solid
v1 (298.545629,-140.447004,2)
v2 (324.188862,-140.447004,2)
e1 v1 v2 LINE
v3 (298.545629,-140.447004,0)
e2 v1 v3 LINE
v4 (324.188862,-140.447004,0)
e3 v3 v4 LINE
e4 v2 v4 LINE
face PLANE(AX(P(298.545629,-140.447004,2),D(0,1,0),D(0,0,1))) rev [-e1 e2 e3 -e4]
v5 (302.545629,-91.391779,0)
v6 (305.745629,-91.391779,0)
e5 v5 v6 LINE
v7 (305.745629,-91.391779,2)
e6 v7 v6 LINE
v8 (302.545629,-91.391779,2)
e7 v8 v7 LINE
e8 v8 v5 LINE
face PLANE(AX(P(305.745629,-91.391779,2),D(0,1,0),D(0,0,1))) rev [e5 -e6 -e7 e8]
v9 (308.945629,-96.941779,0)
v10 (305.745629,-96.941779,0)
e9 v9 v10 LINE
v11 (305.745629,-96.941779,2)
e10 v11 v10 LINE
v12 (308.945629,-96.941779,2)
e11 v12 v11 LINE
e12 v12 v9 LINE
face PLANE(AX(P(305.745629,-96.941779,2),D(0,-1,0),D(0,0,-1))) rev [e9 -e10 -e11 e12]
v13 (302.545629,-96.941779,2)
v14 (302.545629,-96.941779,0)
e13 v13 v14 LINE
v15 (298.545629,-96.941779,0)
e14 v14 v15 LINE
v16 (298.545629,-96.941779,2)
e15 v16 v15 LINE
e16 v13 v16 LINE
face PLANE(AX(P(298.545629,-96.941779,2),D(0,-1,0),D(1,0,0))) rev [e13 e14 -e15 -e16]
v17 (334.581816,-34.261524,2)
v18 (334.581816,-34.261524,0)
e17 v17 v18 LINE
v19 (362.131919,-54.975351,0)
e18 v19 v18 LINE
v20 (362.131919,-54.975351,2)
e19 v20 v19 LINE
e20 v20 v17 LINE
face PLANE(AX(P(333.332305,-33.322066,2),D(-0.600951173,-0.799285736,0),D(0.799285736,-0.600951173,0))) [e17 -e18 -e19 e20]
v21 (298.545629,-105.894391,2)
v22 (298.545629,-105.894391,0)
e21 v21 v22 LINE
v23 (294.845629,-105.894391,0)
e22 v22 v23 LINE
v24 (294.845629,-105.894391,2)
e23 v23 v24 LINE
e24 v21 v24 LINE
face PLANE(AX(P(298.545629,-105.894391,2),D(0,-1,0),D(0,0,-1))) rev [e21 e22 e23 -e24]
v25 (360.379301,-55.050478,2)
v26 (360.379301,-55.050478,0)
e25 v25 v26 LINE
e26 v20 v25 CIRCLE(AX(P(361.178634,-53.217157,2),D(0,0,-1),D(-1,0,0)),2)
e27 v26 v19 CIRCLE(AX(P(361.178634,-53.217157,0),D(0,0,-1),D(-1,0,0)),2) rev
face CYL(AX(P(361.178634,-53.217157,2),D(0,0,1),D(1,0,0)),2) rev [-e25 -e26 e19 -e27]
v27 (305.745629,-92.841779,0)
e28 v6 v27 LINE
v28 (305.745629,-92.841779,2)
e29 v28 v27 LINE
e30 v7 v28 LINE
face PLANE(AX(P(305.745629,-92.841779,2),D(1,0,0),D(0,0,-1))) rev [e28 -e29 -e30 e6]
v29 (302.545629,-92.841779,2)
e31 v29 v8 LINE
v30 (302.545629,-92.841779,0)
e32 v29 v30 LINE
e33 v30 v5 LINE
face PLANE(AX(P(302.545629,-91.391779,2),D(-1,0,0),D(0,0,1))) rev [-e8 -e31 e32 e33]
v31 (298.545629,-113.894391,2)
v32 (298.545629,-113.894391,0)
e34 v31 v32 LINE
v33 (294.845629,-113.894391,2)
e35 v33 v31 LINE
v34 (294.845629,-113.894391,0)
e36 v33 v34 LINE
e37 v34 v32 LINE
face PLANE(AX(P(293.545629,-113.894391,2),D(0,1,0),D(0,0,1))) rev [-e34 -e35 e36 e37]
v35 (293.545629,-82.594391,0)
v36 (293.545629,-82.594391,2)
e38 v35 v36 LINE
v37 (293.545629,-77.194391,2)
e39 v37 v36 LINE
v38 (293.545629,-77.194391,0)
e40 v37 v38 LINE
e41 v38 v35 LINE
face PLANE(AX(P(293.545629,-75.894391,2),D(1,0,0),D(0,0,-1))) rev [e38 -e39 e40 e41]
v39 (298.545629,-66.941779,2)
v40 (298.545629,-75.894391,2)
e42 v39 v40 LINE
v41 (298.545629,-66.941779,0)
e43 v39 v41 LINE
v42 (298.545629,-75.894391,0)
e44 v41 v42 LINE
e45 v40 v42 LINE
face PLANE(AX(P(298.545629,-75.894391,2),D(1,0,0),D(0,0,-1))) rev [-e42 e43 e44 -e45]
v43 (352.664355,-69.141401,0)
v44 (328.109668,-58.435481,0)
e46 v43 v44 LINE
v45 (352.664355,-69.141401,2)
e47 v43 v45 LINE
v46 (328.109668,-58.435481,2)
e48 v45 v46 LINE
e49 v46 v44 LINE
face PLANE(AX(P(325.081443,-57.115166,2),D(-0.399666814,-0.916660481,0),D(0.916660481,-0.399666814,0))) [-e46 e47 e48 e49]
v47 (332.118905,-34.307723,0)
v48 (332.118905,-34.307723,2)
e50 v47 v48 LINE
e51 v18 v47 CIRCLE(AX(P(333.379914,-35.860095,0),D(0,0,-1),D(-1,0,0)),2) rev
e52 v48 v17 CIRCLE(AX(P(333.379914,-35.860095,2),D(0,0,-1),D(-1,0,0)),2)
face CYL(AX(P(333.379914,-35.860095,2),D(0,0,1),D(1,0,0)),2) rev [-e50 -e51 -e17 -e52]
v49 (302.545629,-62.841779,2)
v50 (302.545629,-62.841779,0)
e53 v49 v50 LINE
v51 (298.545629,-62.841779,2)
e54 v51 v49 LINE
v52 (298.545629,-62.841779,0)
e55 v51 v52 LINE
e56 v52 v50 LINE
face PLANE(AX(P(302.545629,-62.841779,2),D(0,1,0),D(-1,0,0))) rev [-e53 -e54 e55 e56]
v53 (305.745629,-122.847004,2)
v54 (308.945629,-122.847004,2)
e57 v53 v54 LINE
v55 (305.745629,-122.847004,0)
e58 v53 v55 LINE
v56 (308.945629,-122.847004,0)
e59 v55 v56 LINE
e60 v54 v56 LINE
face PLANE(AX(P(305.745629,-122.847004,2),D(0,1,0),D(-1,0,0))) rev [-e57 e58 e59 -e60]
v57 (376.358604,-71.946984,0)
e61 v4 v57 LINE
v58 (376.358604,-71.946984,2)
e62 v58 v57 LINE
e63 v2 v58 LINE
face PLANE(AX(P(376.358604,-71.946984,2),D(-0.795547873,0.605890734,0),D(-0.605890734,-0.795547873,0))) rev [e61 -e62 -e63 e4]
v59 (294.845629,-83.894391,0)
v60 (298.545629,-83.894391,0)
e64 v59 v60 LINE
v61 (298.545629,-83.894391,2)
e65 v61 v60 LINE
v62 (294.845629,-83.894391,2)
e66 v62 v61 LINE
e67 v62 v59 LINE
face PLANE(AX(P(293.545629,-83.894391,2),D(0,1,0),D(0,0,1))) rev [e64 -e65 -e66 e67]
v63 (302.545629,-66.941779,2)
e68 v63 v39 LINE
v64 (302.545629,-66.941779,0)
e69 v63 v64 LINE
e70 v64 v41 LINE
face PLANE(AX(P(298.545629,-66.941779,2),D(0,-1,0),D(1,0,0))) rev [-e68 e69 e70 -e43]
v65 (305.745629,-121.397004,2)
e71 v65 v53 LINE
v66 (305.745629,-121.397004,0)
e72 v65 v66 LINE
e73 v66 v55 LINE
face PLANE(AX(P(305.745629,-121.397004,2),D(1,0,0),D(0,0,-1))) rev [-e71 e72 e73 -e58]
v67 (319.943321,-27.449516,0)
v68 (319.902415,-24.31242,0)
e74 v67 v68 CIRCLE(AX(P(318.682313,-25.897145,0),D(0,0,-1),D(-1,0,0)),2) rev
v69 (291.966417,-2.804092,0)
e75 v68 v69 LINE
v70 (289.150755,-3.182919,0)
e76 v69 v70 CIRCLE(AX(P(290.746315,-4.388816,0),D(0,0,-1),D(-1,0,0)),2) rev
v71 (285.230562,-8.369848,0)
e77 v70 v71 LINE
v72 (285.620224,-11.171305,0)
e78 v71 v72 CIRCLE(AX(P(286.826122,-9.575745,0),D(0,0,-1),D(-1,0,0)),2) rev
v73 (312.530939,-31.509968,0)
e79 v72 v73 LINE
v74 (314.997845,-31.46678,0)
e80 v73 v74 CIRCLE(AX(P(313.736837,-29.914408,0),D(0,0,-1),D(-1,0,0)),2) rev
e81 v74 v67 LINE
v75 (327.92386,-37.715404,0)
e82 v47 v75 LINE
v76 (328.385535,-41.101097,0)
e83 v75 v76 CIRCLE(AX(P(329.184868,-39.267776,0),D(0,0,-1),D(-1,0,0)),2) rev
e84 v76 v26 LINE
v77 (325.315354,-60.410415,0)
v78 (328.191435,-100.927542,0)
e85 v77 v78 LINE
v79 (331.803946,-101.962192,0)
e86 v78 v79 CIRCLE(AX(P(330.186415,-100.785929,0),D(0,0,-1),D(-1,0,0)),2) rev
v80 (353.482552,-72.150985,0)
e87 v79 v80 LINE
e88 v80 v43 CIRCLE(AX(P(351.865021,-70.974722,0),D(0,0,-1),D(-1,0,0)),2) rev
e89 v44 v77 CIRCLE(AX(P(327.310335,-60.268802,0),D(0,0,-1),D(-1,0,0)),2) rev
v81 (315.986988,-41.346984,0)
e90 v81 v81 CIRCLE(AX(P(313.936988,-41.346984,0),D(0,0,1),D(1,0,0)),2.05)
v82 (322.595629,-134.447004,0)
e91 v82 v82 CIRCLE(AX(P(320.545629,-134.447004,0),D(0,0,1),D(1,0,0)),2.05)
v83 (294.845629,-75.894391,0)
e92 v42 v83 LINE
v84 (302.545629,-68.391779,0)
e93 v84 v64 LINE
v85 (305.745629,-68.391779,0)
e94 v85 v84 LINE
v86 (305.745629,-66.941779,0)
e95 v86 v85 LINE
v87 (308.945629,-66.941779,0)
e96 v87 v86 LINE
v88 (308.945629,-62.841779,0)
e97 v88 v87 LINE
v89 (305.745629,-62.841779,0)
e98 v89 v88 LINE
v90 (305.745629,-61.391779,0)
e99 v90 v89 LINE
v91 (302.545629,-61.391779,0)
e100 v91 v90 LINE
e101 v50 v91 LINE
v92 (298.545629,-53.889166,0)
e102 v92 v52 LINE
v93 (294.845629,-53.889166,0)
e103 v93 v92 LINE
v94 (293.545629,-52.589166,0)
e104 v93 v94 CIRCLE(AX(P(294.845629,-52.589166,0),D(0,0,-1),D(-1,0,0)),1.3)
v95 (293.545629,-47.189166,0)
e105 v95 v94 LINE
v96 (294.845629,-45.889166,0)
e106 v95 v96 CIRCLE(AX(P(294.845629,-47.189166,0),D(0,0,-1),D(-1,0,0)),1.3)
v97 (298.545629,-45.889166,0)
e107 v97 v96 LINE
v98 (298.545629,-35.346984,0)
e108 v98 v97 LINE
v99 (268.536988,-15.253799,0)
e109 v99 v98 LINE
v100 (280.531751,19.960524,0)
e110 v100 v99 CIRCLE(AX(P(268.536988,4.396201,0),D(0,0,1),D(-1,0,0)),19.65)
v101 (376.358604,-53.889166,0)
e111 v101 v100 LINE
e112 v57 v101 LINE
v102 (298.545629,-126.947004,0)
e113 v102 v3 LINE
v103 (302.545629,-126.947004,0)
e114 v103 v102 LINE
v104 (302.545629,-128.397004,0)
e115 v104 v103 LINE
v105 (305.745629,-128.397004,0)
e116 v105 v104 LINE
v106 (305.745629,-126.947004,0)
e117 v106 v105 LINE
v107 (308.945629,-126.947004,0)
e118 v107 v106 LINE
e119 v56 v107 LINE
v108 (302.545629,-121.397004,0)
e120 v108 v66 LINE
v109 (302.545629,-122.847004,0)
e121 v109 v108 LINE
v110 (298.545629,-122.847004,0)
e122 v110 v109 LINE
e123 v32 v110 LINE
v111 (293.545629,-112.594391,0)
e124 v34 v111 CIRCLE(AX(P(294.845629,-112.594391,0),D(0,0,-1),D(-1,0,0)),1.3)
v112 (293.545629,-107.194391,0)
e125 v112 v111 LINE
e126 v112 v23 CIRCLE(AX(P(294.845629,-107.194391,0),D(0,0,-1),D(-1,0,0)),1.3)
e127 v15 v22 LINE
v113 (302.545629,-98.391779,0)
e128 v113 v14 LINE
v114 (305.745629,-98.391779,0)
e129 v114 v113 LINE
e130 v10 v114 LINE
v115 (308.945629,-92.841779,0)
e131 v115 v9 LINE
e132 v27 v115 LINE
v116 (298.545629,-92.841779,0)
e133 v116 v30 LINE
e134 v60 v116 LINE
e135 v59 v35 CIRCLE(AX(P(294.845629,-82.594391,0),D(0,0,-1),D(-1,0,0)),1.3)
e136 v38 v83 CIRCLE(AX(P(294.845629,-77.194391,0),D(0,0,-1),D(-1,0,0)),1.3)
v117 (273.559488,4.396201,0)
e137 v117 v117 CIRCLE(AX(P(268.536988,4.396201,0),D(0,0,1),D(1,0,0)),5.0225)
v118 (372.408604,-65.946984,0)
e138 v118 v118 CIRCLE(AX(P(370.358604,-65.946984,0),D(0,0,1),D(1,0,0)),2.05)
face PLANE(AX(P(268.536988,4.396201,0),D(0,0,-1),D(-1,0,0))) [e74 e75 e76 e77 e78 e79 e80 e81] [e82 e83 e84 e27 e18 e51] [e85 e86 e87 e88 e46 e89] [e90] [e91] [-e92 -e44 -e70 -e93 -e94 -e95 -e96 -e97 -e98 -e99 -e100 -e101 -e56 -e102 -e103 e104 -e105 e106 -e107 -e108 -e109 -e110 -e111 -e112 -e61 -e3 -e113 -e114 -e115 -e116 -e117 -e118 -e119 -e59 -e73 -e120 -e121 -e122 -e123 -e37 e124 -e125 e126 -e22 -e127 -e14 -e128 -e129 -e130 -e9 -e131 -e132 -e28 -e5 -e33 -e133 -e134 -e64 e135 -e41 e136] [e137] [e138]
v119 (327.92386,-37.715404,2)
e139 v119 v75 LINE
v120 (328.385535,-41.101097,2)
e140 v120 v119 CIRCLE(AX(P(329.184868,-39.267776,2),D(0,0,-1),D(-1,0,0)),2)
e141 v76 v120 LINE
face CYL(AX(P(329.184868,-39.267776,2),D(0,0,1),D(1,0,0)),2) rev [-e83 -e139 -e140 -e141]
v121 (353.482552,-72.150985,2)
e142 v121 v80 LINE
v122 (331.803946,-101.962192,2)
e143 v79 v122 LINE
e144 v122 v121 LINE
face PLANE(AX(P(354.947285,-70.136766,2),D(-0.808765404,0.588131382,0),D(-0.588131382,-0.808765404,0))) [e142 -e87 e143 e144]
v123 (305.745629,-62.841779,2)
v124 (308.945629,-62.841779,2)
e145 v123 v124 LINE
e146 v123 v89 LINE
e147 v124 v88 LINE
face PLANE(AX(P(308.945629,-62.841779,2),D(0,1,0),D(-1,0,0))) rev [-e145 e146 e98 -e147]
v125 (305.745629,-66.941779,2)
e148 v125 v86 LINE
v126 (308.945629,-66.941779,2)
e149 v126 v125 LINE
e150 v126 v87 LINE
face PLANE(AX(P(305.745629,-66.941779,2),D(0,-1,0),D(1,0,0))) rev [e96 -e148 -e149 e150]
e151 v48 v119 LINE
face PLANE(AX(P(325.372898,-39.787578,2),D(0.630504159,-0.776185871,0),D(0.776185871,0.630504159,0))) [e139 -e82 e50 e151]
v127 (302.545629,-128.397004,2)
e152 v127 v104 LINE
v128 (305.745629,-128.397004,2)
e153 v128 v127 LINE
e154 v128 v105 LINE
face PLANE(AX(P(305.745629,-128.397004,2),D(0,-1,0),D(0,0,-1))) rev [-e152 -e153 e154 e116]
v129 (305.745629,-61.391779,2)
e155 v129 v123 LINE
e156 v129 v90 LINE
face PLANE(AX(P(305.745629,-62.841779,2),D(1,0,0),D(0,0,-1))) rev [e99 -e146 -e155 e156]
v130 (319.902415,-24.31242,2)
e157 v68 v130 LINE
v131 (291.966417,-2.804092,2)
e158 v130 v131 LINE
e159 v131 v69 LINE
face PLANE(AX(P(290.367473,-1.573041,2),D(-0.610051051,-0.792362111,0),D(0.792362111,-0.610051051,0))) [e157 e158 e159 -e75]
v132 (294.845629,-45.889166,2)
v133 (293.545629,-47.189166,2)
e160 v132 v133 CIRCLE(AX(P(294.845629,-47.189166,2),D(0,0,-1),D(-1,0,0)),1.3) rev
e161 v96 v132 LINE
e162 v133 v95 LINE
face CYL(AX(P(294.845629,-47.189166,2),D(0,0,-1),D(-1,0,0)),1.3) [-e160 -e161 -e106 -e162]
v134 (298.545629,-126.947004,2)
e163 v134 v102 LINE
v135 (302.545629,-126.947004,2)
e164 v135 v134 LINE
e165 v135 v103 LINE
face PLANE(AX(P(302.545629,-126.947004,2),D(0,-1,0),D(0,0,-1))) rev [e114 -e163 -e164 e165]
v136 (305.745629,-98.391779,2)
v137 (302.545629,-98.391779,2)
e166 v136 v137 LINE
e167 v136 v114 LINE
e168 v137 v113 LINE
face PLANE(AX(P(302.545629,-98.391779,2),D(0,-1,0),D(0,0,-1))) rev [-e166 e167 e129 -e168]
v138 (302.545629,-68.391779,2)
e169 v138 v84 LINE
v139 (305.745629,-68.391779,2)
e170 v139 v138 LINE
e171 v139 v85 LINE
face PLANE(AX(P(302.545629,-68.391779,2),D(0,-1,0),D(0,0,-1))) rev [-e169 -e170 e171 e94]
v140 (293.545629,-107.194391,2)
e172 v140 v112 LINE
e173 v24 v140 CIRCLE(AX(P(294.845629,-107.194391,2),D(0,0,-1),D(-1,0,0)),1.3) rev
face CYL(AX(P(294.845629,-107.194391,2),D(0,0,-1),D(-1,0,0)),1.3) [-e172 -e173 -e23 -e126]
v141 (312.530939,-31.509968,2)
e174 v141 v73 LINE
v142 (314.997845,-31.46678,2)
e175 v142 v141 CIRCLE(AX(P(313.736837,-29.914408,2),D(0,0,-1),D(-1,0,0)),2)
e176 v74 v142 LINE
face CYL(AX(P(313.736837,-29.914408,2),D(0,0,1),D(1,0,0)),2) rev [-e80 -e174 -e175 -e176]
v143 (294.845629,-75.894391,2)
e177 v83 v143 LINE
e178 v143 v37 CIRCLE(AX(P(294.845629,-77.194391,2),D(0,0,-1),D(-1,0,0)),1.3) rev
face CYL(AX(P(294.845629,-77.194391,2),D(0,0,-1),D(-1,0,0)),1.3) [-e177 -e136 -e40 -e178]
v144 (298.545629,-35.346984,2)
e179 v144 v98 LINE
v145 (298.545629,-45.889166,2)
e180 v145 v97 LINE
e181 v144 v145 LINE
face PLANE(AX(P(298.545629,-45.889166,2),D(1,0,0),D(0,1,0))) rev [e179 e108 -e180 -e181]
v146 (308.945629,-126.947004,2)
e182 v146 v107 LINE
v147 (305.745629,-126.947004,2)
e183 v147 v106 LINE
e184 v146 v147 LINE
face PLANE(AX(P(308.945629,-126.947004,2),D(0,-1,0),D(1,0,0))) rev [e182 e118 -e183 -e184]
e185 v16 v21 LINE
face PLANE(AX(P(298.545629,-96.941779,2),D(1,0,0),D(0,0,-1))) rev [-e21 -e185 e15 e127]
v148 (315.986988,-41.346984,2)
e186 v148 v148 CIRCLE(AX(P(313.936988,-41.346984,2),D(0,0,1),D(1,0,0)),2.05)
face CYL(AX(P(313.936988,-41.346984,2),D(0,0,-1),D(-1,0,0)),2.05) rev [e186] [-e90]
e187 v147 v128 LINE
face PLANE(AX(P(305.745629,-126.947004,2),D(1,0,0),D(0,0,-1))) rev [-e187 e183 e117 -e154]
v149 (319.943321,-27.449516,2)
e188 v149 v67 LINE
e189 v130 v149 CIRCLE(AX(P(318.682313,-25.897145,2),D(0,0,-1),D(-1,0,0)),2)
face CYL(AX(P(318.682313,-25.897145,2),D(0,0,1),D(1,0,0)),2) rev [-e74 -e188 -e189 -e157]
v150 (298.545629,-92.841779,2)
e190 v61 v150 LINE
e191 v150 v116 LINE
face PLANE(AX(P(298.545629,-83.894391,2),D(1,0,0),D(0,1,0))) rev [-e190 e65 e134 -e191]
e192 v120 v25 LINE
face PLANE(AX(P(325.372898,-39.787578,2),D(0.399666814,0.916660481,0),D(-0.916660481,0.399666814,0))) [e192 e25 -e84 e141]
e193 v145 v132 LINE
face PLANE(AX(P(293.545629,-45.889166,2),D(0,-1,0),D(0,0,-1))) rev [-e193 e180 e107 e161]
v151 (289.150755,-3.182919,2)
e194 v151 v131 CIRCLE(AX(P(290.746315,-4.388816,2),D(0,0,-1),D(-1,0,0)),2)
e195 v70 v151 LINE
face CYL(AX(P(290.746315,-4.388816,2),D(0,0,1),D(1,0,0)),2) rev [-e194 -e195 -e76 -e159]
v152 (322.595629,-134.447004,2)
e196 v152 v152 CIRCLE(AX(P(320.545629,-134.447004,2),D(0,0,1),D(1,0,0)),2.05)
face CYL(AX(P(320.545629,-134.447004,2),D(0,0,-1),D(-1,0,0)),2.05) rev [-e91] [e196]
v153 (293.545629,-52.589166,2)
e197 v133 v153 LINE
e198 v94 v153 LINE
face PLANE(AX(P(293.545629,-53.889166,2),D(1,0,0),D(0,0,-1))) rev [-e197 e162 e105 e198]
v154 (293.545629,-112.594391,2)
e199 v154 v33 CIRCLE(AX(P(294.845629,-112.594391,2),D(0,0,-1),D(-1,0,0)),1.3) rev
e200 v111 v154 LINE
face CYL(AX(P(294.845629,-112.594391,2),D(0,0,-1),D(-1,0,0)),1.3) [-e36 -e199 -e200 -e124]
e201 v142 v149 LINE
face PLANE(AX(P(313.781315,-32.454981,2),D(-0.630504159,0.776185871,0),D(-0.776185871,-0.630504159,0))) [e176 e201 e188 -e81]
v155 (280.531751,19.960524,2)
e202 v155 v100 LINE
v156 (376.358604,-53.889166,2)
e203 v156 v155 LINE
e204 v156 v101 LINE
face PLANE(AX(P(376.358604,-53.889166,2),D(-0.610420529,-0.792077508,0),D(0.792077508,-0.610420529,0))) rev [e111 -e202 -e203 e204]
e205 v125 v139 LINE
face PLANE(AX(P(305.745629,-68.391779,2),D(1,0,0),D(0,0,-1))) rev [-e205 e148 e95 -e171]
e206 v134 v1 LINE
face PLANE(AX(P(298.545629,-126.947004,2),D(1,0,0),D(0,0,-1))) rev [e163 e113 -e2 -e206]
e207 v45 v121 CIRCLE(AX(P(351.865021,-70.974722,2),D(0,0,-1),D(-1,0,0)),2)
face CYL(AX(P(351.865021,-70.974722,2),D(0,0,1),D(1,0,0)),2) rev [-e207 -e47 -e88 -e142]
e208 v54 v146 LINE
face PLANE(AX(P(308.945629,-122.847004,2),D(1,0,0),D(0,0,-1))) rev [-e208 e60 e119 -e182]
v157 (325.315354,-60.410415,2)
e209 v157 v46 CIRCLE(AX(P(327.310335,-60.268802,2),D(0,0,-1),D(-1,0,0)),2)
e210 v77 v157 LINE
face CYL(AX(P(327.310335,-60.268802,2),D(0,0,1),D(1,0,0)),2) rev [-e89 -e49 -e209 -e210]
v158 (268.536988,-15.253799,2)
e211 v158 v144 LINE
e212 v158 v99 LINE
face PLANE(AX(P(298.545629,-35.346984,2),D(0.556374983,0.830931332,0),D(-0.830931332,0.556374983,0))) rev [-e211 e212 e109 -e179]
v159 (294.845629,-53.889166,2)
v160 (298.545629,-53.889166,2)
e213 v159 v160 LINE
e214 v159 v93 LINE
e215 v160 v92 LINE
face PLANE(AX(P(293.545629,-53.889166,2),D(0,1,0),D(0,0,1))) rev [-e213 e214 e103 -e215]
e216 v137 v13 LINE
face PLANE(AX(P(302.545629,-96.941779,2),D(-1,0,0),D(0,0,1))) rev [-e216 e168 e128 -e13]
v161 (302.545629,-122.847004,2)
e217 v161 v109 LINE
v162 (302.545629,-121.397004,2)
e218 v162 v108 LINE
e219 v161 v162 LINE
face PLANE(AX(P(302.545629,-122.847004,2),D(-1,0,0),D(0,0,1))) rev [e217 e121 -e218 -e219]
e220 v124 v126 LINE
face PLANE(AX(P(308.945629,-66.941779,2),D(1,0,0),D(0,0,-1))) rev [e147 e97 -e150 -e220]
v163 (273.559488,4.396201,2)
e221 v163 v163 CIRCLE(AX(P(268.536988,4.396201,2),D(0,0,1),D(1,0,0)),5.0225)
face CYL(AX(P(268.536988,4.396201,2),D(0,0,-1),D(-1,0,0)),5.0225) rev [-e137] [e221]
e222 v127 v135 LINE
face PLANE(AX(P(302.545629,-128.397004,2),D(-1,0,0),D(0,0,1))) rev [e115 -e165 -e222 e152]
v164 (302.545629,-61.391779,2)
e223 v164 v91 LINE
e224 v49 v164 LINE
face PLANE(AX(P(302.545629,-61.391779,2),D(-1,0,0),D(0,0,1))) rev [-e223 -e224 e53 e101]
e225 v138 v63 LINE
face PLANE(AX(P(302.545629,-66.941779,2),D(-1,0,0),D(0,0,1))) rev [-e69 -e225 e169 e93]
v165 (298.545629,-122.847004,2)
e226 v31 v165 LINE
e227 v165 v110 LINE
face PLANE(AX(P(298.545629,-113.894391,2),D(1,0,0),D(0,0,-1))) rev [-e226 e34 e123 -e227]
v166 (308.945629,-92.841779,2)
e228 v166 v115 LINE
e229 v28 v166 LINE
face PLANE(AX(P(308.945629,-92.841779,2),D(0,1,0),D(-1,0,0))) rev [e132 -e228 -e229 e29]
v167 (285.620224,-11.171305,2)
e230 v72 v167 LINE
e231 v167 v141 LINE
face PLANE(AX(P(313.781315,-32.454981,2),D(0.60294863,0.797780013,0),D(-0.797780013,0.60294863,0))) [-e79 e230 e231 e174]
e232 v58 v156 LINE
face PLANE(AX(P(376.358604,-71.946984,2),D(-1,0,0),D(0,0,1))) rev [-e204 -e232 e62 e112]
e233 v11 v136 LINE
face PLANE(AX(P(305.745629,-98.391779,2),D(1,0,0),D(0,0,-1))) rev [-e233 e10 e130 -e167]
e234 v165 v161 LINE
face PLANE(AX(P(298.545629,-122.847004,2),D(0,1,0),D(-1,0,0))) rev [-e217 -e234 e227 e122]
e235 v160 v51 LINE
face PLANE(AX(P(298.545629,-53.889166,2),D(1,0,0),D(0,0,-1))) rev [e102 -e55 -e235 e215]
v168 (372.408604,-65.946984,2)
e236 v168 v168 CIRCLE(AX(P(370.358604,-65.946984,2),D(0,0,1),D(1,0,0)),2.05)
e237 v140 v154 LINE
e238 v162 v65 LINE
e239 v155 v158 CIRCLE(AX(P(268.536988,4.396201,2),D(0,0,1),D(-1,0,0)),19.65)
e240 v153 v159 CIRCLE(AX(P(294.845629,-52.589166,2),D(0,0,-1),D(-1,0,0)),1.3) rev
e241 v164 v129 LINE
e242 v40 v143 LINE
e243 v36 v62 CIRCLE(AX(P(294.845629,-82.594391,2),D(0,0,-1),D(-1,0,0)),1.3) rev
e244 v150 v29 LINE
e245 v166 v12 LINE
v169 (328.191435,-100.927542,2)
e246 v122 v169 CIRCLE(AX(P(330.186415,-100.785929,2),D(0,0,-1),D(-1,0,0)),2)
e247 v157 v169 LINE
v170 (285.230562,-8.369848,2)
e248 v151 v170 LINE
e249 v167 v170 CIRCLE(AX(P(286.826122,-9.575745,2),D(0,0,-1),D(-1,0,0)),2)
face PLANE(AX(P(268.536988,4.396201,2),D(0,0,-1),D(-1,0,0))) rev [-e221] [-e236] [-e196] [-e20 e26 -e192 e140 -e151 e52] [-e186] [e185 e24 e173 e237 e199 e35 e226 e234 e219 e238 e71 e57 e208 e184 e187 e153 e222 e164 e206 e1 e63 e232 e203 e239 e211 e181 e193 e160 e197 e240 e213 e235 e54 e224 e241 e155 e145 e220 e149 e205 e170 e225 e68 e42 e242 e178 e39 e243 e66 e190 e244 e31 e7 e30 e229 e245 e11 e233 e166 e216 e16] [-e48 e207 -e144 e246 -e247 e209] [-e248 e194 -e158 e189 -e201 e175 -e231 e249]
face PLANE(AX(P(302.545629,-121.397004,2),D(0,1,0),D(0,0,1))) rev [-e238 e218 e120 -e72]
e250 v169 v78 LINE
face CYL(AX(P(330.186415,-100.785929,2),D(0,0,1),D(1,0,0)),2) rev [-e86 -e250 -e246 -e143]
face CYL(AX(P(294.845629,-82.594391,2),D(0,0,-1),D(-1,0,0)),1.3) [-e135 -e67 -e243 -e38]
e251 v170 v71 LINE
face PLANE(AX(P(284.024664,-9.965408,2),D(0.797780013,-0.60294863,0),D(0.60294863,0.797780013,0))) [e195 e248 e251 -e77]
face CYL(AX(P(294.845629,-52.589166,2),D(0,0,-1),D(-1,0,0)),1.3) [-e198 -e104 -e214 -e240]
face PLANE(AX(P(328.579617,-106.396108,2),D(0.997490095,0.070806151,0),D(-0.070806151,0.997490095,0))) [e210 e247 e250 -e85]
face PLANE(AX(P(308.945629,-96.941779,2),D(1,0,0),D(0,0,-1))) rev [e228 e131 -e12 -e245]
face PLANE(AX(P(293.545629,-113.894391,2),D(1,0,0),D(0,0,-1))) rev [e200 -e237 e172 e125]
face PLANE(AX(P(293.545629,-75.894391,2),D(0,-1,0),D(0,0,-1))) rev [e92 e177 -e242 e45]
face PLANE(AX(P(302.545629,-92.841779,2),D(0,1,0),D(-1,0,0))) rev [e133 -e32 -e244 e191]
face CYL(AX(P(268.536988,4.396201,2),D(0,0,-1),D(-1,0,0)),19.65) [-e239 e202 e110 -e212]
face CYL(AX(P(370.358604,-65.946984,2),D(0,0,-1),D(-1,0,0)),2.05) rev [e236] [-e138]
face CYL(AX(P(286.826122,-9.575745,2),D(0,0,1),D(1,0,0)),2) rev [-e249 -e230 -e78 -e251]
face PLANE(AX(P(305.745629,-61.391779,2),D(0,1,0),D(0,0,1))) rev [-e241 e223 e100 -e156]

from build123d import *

# Parameters (mm, degrees)
SKETCH_1_R      = 5.0225
SKETCH_1_R_2    = 2.05
EXTRUDE_1_DEPTH = 2
FILLET_1_R      = 2
FILLET_2_R      = 1.3


with BuildPart() as part:
    # 草图1 → 凸台-拉伸1 (new body)
    with BuildSketch(Plane.XY):
        with BuildLine():
            Line((298.545628784, -83.894391363), (298.545628784, -92.841778663))
            Line((298.545628784, -92.841778663), (302.545628784, -92.841778663))
            Line((302.545628784, -92.841778663), (302.545628784, -91.391778663))
            Line((302.545628784, -91.391778663), (305.745628784, -91.391778663))
            Line((305.745628784, -91.391778663), (305.745628784, -92.841778663))
            Line((305.745628784, -92.841778663), (308.945628784, -92.841778663))
            Line((308.945628784, -92.841778663), (308.945628784, -96.941778663))
            Line((308.945628784, -96.941778663), (305.745628784, -96.941778663))
            Line((305.745628784, -96.941778663), (305.745628784, -98.391778663))
            Line((305.745628784, -98.391778663), (302.545628784, -98.391778663))
            Line((302.545628784, -98.391778663), (302.545628784, -96.941778663))
            Line((302.545628784, -96.941778663), (298.545628784, -96.941778663))
            Line((298.545628784, -96.941778663), (298.545628784, -105.894391358))
            Line((298.545628784, -105.894391358), (293.545628784, -105.894391358))
            Line((293.545628784, -105.894391358), (293.545628784, -113.894391358))
            Line((293.545628784, -113.894391358), (298.545628784, -113.894391358))
            Line((298.545628784, -113.894391358), (298.545628784, -122.847004054))
            Line((298.545628784, -122.847004054), (302.545628784, -122.847004054))
            Line((302.545628784, -122.847004054), (302.545628784, -121.397004054))
            Line((302.545628784, -121.397004054), (305.745628784, -121.397004054))
            Line((305.745628784, -121.397004054), (305.745628784, -122.847004054))
            Line((305.745628784, -122.847004054), (308.945628784, -122.847004054))
            Line((308.945628784, -122.847004054), (308.945628784, -126.947004054))
            Line((308.945628784, -126.947004054), (305.745628784, -126.947004054))
            Line((305.745628784, -126.947004054), (305.745628784, -128.397004054))
            Line((305.745628784, -128.397004054), (302.545628784, -128.397004054))
            Line((302.545628784, -128.397004054), (302.545628784, -126.947004054))
            Line((302.545628784, -126.947004054), (298.545628784, -126.947004054))
            Line((298.545628784, -126.947004054), (298.545628784, -140.447004054))
            Line((298.545628784, -140.447004054), (324.188862368, -140.447004054))
            Line((324.188862368, -140.447004054), (376.358604426, -71.946984141))
            Line((376.358604426, -71.946984141), (376.358604426, -53.889165972))
            Line((376.358604426, -53.889165972), (280.531751023, 19.960524179))
            ThreePointArc((280.531751023, 19.960524179), (249.936430553, 10.731954958), (268.536987634, -15.253798847))
            Line((268.536987634, -15.253798847), (298.545628784, -35.346984141))
            Line((298.545628784, -35.346984141), (298.545628784, -45.889165972))
            Line((298.545628784, -45.889165972), (293.545628784, -45.889165972))
            Line((293.545628784, -45.889165972), (293.545628784, -53.889165972))
            Line((293.545628784, -53.889165972), (298.545628784, -53.889165972))
            Line((298.545628784, -53.889165972), (298.545628784, -62.841778668))
            Line((298.545628784, -62.841778668), (302.545628784, -62.841778668))
            Line((302.545628784, -62.841778668), (302.545628784, -61.391778668))
            Line((302.545628784, -61.391778668), (305.745628784, -61.391778668))
            Line((305.745628784, -61.391778668), (305.745628784, -62.841778668))
            Line((305.745628784, -62.841778668), (308.945628784, -62.841778668))
            Line((308.945628784, -62.841778668), (308.945628784, -66.941778668))
            Line((308.945628784, -66.941778668), (305.745628784, -66.941778668))
            Line((305.745628784, -66.941778668), (305.745628784, -68.391778668))
            Line((305.745628784, -68.391778668), (302.545628784, -68.391778668))
            Line((302.545628784, -68.391778668), (302.545628784, -66.941778668))
            Line((302.545628784, -66.941778668), (298.545628784, -66.941778668))
            Line((298.545628784, -66.941778668), (298.545628784, -75.894391363))
            Line((298.545628784, -75.894391363), (293.545628784, -75.894391363))
            Line((293.545628784, -75.894391363), (293.545628784, -83.894391363))
            Line((293.545628784, -83.894391363), (298.545628784, -83.894391363))
        make_face()
        with Locations((268.536987634, 4.396201153)):
            Circle(SKETCH_1_R, mode=Mode.SUBTRACT)
        with Locations((320.545628784, -134.447004054)):
            Circle(SKETCH_1_R_2, mode=Mode.SUBTRACT)
        with Locations((370.358604426, -65.946984141)):
            Circle(SKETCH_1_R_2, mode=Mode.SUBTRACT)
        with Locations((313.936987634, -41.346984141)):
            Circle(SKETCH_1_R_2, mode=Mode.SUBTRACT)
        Polygon((354.947285032, -70.136765586), (328.579617375, -106.396108383), (325.08144343, -57.115165973), align=None, mode=Mode.SUBTRACT)
        Polygon((333.332304748, -33.322065963), (362.131919364, -54.975351392), (362.3086526, -55.891681452), (325.3728981, -39.787577877), align=None, mode=Mode.SUBTRACT)
        Polygon((290.367472723, -1.573041375), (321.906127186, -25.855107664), (313.781314718, -32.454980511), (284.02466426, -9.965407758), align=None, mode=Mode.SUBTRACT)
    extrude(amount=EXTRUDE_1_DEPTH)

    # 圆角1
    # the kernel refuses this fillet: 2 mm, written as the material it adds along each edge
    with BuildSketch(Plane(origin=(325.08144343, -57.115165973, 0), x_dir=(0.07080615119568372, -0.9974900946640293, 0), z_dir=(0, 0, 1))) as fillet_1_piece_1:
        with BuildLine():
            CenterArc((FILLET_1_R * 1.651770121, FILLET_1_R), FILLET_1_R, 152.382357743, 117.617642257)
            Line((FILLET_1_R * 0.765709239798, FILLET_1_R * 1.46356888895), (FILLET_1_R * 0.747988022174, FILLET_1_R * 1.47284026673))
            Line((FILLET_1_R * 0.747988022174, FILLET_1_R * 1.47284026673), (-FILLET_1_R * 0.03303540242, -FILLET_1_R * 0.02))
            Line((-FILLET_1_R * 0.03303540242, -FILLET_1_R * 0.02), (FILLET_1_R * 1.651770121, -FILLET_1_R * 0.02))
            Line((FILLET_1_R * 1.651770121, -FILLET_1_R * 0.02), (FILLET_1_R * 1.651770121, 0))
        make_face()
    extrude(amount=2)
    with BuildSketch(Plane(origin=(328.579617375, -106.396108383, 0), x_dir=(0.5881313815647177, 0.8087654035743471, 0), z_dir=(0, 0, 1))) as fillet_1_piece_2:
        with BuildLine():
            CenterArc((FILLET_1_R * 2.74116347671, FILLET_1_R), FILLET_1_R, 130.084808377, 139.915191623)
            Line((FILLET_1_R * 2.09724268379, FILLET_1_R * 1.76509215945), (FILLET_1_R * 2.08436426794, FILLET_1_R * 1.78039400264))
            Line((FILLET_1_R * 2.08436426794, FILLET_1_R * 1.78039400264), (-FILLET_1_R * 0.0128784158584, FILLET_1_R * 0.0153018431889))
            Line((-FILLET_1_R * 0.0128784158584, FILLET_1_R * 0.0153018431889), (0, -FILLET_1_R * 0.02))
            Line((0, -FILLET_1_R * 0.02), (FILLET_1_R * 2.74116347671, -FILLET_1_R * 0.02))
            Line((FILLET_1_R * 2.74116347671, -FILLET_1_R * 0.02), (FILLET_1_R * 2.74116347671, 0))
        make_face()
    extrude(amount=2)
    with BuildSketch(Plane(origin=(354.947285032, -70.136765586, 0), x_dir=(-0.588131381564712, -0.8087654035743512, 0), z_dir=(0, 0, 1))) as fillet_1_piece_3:
        with BuildLine():
            CenterArc((FILLET_1_R * 1.24524308483, -FILLET_1_R), FILLET_1_R, 90, 102.467166119)
            Line((FILLET_1_R * 0.268823205284, -FILLET_1_R * 1.2158801029), (FILLET_1_R * 0.249294807693, -FILLET_1_R * 1.22019770495))
            Line((FILLET_1_R * 0.249294807693, -FILLET_1_R * 1.22019770495), (-FILLET_1_R * 0.0249048616966, FILLET_1_R * 0.02))
            Line((-FILLET_1_R * 0.0249048616966, FILLET_1_R * 0.02), (FILLET_1_R * 1.24524308483, FILLET_1_R * 0.02))
            Line((FILLET_1_R * 1.24524308483, FILLET_1_R * 0.02), (FILLET_1_R * 1.24524308483, 0))
        make_face()
    extrude(amount=2)
    with BuildSketch(Plane(origin=(362.3086526, -55.891681452, 0), x_dir=(-0.18938048682828962, 0.9819037789970461, 0), z_dir=(0, 0, 1))) as fillet_1_piece_4:
        with BuildLine():
            CenterArc((2.840129073, 0.603066583), FILLET_1_R, 145.526016586, 52.023702881)
            Line((1.191362484, 1.73513051), (1.158387152, 1.757771789))
            Line((1.158387152, 1.757771789), (-0.032975332, 0.022641279))
            Line((-0.032975332, 0.022641279), (0, -0.04))
            ThreePointArc((0, -0.04), (0.466608888, -0.04), (0.895079549, -0.012061332))
            Line((0.895079549, -0.012061332), (0.933217775, 0))
        make_face()
    extrude(amount=2)
    with BuildSketch(Plane(origin=(333.332304748, -33.322065963, 0), x_dir=(0.7992857360296067, -0.60095117287481, 0), z_dir=(0, 0, 1))) as fillet_1_piece_5:
        with BuildLine():
            CenterArc((FILLET_1_R * 0.781642351799, -FILLET_1_R), FILLET_1_R, 90, 76.025379067)
            Line((-FILLET_1_R * 0.188760438175, -FILLET_1_R * 0.758507918948), (-FILLET_1_R * 0.208168493974, -FILLET_1_R * 0.753678077327))
            Line((-FILLET_1_R * 0.208168493974, -FILLET_1_R * 0.753678077327), (-FILLET_1_R * 0.015632847036, FILLET_1_R * 0.02))
            Line((-FILLET_1_R * 0.015632847036, FILLET_1_R * 0.02), (FILLET_1_R * 0.781642351799, FILLET_1_R * 0.02))
            Line((FILLET_1_R * 0.781642351799, FILLET_1_R * 0.02), (FILLET_1_R * 0.781642351799, 0))
        make_face()
    extrude(amount=2)
    with BuildSketch(Plane(origin=(325.3728981, -39.787577877, 0), x_dir=(0.9166604811079961, -0.3996668142026018, 0), z_dir=(0, 0, 1))) as fillet_1_piece_6:
        with BuildLine():
            CenterArc((FILLET_1_R * 1.64326737589, FILLET_1_R), FILLET_1_R, 152.644679345, 117.355320655)
            Line((FILLET_1_R * 0.755093396155, FILLET_1_R * 1.459507325), (FILLET_1_R * 0.737329916561, FILLET_1_R * 1.4686974715))
            Line((FILLET_1_R * 0.737329916561, FILLET_1_R * 1.4686974715), (-FILLET_1_R * 0.0328653475177, -FILLET_1_R * 0.02))
            Line((-FILLET_1_R * 0.0328653475177, -FILLET_1_R * 0.02), (FILLET_1_R * 1.64326737589, -FILLET_1_R * 0.02))
            Line((FILLET_1_R * 1.64326737589, -FILLET_1_R * 0.02), (FILLET_1_R * 1.64326737589, 0))
        make_face()
    extrude(amount=2)
    with BuildSketch(Plane(origin=(321.906127186, -25.855107664, 0), x_dir=(-0.7923621110530705, 0.6100510511158238, 0), z_dir=(0, 0, 1))) as fillet_1_piece_7:
        with BuildLine():
            CenterArc((FILLET_1_R * 1.2643919182, FILLET_1_R), FILLET_1_R, 166.68052265, 103.31947735)
            Line((FILLET_1_R * 0.291291305651, FILLET_1_R * 1.2303805501), (FILLET_1_R * 0.2718292934, FILLET_1_R * 1.2349881611))
            Line((FILLET_1_R * 0.2718292934, FILLET_1_R * 1.2349881611), (-FILLET_1_R * 0.0252878383639, -FILLET_1_R * 0.02))
            Line((-FILLET_1_R * 0.0252878383639, -FILLET_1_R * 0.02), (FILLET_1_R * 1.2643919182, -FILLET_1_R * 0.02))
            Line((FILLET_1_R * 1.2643919182, -FILLET_1_R * 0.02), (FILLET_1_R * 1.2643919182, 0))
        make_face()
    extrude(amount=2)
    with BuildSketch(Plane(origin=(313.781314718, -32.454980511, 0), x_dir=(0.7761858705448689, 0.6305041588812115, 0), z_dir=(0, 0, 1))) as fillet_1_piece_8:
        with BuildLine():
            CenterArc((FILLET_1_R * 0.7836591646, FILLET_1_R), FILLET_1_R, 193.831300809, 76.168699191)
            Line((-FILLET_1_R * 0.187344659052, FILLET_1_R * 0.760936045267), (-FILLET_1_R * 0.206764735525, FILLET_1_R * 0.756154766172))
            Line((-FILLET_1_R * 0.206764735525, FILLET_1_R * 0.756154766172), (-FILLET_1_R * 0.015673183292, -FILLET_1_R * 0.02))
            Line((-FILLET_1_R * 0.015673183292, -FILLET_1_R * 0.02), (FILLET_1_R * 0.7836591646, -FILLET_1_R * 0.02))
            Line((FILLET_1_R * 0.7836591646, -FILLET_1_R * 0.02), (FILLET_1_R * 0.7836591646, 0))
        make_face()
    extrude(amount=2)
    with BuildSketch(Plane(origin=(290.367472723, -1.573041375, 0), x_dir=(0.7923621110530753, -0.6100510511158177, 0), z_dir=(0, 0, 1))) as fillet_1_piece_9:
        with BuildLine():
            CenterArc((FILLET_1_R * 1.00897314279, -FILLET_1_R), FILLET_1_R, 90, 90.511823459)
            Line((FILLET_1_R * 0.00901304180913, -FILLET_1_R * 1.00893288575), (-FILLET_1_R * 0.0109861602105, -FILLET_1_R * 1.00911154346))
            Line((-FILLET_1_R * 0.0109861602105, -FILLET_1_R * 1.00911154346), (-FILLET_1_R * 0.0201794628558, FILLET_1_R * 0.02))
            Line((-FILLET_1_R * 0.0201794628558, FILLET_1_R * 0.02), (FILLET_1_R * 1.00897314279, FILLET_1_R * 0.02))
            Line((FILLET_1_R * 1.00897314279, FILLET_1_R * 0.02), (FILLET_1_R * 1.00897314279, 0))
        make_face()
    extrude(amount=2)
    with BuildSketch(Plane(origin=(284.02466426, -9.965407758, 0), x_dir=(0.7977800129226009, -0.6029486304663231, 0), z_dir=(0, 0, 1))) as fillet_1_piece_10:
        with BuildLine():
            CenterArc((FILLET_1_R, FILLET_1_R), FILLET_1_R, 180, 90)
            Line((0, FILLET_1_R), (-FILLET_1_R * 0.02, FILLET_1_R))
            Line((-FILLET_1_R * 0.02, FILLET_1_R), (-FILLET_1_R * 0.02, -FILLET_1_R * 0.02))
            Line((-FILLET_1_R * 0.02, -FILLET_1_R * 0.02), (FILLET_1_R, -FILLET_1_R * 0.02))
            Line((FILLET_1_R, -FILLET_1_R * 0.02), (FILLET_1_R, 0))
        make_face()
    extrude(amount=2)

    # 圆角2
    fillet_2_edges = [part.edges().sort_by_distance(p)[0] for p in [
        (293.545628784, -113.894391358, 1),
        (293.545628784, -105.894391358, 1),
        (293.545628784, -83.894391363, 1),
        (293.545628784, -75.894391363, 1),
        (293.545628784, -53.889165972, 1),
        (293.545628784, -45.889165972, 1),
    ]]
    fillet(fillet_2_edges, radius=FILLET_2_R)


solid = part.part
